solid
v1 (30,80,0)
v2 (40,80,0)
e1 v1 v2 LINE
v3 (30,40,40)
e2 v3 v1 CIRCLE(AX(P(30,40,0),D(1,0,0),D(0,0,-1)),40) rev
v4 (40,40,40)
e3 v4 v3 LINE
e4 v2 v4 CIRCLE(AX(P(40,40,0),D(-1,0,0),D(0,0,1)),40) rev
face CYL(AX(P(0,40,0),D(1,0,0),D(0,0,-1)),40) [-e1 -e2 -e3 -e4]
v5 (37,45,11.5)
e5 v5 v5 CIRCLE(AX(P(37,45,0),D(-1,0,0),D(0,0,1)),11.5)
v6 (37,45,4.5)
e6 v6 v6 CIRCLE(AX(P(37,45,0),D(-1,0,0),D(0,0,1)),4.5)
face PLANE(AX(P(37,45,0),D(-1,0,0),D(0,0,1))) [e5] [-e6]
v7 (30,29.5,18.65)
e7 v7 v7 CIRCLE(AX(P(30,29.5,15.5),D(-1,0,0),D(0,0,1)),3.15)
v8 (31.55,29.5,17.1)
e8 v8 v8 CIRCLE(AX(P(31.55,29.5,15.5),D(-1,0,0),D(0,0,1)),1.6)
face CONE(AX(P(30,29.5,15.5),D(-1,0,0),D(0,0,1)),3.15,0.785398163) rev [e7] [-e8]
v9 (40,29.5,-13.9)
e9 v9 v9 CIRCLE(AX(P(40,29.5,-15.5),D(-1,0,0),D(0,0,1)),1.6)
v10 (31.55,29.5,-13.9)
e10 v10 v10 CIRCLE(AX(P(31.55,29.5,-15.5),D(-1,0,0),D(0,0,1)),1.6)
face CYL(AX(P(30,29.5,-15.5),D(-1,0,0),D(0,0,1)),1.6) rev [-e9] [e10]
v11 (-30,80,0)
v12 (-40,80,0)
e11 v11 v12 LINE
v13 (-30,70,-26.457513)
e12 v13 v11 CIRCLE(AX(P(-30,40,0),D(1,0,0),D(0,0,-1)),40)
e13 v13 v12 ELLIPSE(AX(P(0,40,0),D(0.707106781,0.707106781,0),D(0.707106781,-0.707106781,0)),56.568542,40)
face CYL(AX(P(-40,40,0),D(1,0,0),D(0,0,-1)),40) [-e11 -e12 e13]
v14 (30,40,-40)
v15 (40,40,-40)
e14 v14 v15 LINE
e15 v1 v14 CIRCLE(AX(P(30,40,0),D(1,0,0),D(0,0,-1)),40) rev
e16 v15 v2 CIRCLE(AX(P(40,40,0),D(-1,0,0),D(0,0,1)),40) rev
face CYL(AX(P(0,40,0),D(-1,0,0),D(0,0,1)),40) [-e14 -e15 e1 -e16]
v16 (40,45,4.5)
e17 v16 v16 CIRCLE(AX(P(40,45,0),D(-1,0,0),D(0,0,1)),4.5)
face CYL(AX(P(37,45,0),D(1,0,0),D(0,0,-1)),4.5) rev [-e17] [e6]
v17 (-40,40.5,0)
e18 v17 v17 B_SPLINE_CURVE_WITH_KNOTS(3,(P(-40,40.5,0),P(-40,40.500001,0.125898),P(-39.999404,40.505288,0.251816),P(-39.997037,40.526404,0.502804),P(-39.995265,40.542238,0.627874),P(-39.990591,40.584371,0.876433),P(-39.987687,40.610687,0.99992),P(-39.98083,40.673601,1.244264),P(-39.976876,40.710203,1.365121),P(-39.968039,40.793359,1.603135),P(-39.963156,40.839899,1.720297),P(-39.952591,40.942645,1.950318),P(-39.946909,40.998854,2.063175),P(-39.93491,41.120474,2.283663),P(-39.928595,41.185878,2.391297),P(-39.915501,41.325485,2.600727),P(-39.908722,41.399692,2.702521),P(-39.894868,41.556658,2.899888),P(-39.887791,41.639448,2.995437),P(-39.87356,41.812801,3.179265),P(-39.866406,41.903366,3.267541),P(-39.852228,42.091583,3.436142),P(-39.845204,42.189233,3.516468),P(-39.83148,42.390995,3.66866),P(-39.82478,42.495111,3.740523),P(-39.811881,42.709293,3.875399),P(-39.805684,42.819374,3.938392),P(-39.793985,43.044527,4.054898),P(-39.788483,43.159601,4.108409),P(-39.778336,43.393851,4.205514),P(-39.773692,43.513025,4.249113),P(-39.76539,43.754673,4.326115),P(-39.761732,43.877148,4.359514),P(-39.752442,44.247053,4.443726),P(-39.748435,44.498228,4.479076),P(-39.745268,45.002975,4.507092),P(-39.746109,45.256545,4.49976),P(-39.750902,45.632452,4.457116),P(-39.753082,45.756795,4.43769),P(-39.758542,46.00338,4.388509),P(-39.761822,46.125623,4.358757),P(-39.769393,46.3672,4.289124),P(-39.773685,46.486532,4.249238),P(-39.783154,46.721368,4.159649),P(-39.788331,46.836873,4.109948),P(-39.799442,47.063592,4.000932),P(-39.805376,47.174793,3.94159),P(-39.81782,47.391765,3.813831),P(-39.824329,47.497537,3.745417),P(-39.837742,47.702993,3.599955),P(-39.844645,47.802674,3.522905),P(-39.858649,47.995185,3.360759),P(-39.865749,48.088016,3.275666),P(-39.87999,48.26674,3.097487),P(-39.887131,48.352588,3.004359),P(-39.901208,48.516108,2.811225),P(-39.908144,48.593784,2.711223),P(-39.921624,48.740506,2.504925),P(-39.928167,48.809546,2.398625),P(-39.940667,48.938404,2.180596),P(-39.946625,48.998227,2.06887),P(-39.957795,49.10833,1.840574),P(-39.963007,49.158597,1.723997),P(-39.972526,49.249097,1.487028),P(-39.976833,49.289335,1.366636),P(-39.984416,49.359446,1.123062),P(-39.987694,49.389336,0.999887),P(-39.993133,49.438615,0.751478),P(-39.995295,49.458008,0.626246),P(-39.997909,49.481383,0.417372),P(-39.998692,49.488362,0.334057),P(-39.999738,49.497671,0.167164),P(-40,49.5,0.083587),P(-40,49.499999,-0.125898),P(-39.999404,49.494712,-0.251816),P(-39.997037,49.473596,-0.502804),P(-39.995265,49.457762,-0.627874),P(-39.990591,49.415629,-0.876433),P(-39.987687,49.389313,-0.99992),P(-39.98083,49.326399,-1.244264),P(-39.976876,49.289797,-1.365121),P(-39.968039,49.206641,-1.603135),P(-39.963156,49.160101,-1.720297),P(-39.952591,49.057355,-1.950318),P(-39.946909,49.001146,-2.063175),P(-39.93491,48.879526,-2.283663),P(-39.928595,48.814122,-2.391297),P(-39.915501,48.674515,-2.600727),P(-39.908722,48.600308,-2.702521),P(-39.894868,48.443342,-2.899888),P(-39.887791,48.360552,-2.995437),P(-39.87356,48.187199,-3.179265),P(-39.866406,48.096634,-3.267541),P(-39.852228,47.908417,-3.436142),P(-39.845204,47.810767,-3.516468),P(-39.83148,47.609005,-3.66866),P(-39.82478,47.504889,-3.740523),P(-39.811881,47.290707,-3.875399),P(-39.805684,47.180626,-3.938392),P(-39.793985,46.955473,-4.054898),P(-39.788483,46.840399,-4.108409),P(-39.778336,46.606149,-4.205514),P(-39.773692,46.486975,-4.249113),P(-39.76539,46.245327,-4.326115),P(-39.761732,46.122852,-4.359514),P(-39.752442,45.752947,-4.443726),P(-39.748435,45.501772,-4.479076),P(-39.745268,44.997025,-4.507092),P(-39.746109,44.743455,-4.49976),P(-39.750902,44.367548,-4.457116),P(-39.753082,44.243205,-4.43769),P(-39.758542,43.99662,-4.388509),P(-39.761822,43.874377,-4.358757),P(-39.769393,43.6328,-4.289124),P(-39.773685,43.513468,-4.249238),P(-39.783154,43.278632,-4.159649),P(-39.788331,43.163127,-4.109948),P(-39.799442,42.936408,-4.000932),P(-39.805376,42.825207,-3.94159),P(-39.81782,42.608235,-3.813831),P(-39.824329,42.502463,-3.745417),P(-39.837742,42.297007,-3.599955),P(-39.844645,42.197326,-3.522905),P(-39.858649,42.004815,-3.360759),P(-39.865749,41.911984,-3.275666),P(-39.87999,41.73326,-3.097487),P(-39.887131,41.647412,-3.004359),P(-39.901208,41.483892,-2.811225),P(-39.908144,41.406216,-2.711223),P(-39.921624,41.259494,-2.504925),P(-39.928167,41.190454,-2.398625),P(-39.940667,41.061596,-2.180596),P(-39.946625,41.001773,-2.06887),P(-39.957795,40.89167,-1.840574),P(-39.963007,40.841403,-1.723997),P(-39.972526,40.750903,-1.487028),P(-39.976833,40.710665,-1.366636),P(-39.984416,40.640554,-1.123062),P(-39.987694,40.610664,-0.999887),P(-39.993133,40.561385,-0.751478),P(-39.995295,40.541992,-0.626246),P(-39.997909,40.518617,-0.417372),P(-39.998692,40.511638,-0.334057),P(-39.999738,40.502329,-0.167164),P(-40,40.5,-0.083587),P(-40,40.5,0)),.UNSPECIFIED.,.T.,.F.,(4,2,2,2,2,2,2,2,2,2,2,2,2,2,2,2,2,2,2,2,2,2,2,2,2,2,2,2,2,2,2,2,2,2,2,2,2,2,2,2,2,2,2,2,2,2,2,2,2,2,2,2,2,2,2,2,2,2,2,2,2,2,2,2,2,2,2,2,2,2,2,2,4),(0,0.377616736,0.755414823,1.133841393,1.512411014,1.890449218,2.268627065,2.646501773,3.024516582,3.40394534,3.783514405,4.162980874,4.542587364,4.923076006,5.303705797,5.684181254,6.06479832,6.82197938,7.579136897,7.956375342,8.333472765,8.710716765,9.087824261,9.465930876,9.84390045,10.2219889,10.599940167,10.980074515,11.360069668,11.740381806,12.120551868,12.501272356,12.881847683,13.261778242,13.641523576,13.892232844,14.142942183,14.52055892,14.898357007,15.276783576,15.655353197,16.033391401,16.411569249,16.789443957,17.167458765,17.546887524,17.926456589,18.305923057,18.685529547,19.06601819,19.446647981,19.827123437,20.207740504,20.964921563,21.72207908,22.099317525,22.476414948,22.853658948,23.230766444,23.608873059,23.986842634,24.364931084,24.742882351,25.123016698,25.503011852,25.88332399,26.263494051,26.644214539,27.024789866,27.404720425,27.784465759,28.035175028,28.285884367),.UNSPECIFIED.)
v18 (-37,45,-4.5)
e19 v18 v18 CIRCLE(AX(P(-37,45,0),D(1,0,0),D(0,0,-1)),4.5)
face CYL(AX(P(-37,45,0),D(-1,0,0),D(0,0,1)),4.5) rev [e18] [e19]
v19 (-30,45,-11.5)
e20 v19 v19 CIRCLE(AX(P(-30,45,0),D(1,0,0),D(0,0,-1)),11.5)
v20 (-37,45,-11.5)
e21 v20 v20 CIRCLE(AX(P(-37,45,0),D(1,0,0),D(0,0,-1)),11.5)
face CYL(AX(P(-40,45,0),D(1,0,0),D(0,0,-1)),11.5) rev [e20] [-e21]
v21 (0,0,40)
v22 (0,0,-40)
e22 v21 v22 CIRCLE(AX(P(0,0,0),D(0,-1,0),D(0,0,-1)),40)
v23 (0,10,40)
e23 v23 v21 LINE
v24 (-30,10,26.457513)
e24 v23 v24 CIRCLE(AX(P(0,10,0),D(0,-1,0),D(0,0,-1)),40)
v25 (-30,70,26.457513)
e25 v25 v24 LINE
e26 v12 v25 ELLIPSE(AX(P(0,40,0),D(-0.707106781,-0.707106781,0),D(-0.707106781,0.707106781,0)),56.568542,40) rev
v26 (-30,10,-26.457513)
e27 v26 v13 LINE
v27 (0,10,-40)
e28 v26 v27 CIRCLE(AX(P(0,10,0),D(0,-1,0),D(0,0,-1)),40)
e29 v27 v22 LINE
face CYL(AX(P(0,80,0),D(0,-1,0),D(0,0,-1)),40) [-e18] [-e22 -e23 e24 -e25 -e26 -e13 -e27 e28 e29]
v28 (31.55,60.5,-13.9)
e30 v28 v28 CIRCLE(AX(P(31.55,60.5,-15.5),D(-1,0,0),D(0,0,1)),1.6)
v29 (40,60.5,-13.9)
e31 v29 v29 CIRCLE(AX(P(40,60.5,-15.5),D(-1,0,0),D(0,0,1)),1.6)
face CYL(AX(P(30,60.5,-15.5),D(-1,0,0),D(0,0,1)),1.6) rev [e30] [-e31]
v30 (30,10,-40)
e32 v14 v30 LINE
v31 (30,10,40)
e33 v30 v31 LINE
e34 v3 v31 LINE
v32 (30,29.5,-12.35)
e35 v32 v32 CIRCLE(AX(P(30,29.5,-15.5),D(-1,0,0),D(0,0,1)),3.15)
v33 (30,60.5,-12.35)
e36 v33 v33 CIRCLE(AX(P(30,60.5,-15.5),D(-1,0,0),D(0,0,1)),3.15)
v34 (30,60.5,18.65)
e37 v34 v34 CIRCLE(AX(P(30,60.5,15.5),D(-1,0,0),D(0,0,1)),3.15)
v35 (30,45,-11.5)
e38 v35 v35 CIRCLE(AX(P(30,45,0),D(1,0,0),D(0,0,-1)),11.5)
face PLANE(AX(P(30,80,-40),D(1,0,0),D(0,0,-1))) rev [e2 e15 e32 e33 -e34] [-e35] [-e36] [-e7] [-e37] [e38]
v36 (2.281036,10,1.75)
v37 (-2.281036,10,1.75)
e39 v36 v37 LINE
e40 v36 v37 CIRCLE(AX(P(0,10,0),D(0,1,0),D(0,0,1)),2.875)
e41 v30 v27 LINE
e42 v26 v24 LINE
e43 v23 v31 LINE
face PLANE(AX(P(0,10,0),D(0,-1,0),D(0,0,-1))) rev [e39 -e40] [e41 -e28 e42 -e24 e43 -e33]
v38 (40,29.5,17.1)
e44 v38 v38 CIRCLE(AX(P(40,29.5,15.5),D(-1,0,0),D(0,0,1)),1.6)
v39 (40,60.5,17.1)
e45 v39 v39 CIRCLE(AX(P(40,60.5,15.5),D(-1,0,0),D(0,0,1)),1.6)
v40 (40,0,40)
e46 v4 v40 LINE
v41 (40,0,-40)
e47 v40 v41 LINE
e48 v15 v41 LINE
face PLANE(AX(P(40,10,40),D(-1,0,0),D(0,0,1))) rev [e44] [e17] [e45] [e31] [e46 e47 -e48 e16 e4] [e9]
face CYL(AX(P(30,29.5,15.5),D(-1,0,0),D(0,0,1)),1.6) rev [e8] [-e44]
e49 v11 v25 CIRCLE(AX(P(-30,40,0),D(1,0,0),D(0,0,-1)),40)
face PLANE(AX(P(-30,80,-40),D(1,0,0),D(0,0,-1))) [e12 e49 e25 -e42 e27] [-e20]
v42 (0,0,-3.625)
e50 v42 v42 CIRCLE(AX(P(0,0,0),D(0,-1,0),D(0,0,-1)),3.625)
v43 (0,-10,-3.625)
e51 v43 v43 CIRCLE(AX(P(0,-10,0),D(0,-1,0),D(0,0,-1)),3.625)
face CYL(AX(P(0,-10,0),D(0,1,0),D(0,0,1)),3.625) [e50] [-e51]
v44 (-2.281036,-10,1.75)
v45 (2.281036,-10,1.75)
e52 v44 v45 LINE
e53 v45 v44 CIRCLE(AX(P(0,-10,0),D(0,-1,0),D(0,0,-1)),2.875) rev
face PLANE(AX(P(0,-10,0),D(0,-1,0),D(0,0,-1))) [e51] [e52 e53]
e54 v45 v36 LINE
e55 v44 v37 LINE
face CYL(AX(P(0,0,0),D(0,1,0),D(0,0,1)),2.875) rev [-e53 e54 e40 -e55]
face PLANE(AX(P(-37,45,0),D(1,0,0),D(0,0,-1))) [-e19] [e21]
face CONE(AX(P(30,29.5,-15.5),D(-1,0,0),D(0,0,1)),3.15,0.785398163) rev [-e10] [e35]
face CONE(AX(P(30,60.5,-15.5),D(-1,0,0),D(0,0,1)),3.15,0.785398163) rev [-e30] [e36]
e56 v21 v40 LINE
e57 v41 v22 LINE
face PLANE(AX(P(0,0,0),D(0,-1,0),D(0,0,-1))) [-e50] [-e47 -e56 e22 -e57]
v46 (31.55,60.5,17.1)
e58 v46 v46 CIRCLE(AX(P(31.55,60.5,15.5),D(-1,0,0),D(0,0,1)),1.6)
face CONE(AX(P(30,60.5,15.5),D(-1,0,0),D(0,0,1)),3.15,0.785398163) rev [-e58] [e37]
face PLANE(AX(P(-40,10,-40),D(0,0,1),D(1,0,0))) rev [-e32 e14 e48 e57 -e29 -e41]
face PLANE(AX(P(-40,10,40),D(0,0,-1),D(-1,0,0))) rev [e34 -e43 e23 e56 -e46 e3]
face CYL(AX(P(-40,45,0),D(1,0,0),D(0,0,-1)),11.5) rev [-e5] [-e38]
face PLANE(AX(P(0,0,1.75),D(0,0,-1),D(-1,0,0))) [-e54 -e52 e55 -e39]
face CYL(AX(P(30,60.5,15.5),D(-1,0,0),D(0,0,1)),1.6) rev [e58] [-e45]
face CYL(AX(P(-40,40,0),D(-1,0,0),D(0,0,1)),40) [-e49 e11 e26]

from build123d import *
from build123d.topology import SkipClean

# Parameters (mm, degrees)
SKETCH1_W                                           = 80
SKETCH1_H                                           = 80
BOSS_EXTRUDE1_DEPTH                                 = 10
SKETCH2_W                                           = 10
SKETCH2_H                                           = 80
BOSS_EXTRUDE2_DEPTH                                 = 70
CSK_FOR_M3_COUNTERSUNK_FLAT_HEAD_SCREW1_D           = 3.2
CSK_FOR_M3_COUNTERSUNK_FLAT_HEAD_SCREW1_CSINK_D     = 6.3
CSK_FOR_M3_COUNTERSUNK_FLAT_HEAD_SCREW1_CSINK_ANGLE = 90
CUT_EXTRUDE2_DEPTH                                  = 91
SKETCH7_R                                           = 11.5
CUT_EXTRUDE1_DEPTH                                  = 121
FILLET2_R                                           = 40
SKETCH12_R                                          = 3.625
BOSS_EXTRUDE3_DEPTH                                 = 10
BOSS_EXTRUDE4_START                                 = -7
SKETCH14_R                                          = 11.5
SKETCH14_R_2                                        = 4.5
BOSS_EXTRUDE4_DEPTH                                 = 3
CUT_EXTRUDE4_DEPTH                                  = 98.979589711
BOSS_EXTRUDE5_START                                 = -10
SKETCH15_R                                          = 11.5
SKETCH15_R_2                                        = 4.5
BOSS_EXTRUDE5_DEPTH                                 = 3


with BuildPart() as part:
    # Sketch1 → Boss-Extrude1 (new body)
    with BuildSketch(Plane(origin=(0, 0, 0), x_dir=(1, 0, 0), z_dir=(0, 1, 0))):
        Rectangle(SKETCH1_W, SKETCH1_H)
    extrude(amount=BOSS_EXTRUDE1_DEPTH)

    # Sketch2 → Boss-Extrude2 (add)
    with BuildSketch(Plane(origin=(0, 10, 0), x_dir=(1, 0, 0), z_dir=(0, 1, 0))):
        with Locations((35, 0)):
            Rectangle(SKETCH2_W, SKETCH2_H)
    boss_extrude2 = extrude(amount=BOSS_EXTRUDE2_DEPTH)

    # CSK for M3 Countersunk Flat Head Screw1 (through all)
    with Locations(Plane.ZY.offset(-30)):
        with Locations((-15.5, 60.5), (15.5, 60.5), (15.5, 29.5), (-15.5, 29.5)):
            CounterSinkHole(CSK_FOR_M3_COUNTERSUNK_FLAT_HEAD_SCREW1_D / 2, CSK_FOR_M3_COUNTERSUNK_FLAT_HEAD_SCREW1_CSINK_D / 2, counter_sink_angle=CSK_FOR_M3_COUNTERSUNK_FLAT_HEAD_SCREW1_CSINK_ANGLE)

    # Mirror1: Boss-Extrude2 across plane
    add(boss_extrude2.mirror(Plane(origin=(0, 0, 0), x_dir=(0, 0, 1), z_dir=(1, 0, 0))))

    # Sketch11 → Cut-Extrude2 (cut, through all)
    with BuildSketch(Plane(origin=(0, 10, 0), x_dir=(1, 0, 0), z_dir=(0, 1, 0))):
        with BuildLine():
            Line((-2.281035949, -1.75), (2.281035949, -1.75))
            ThreePointArc((2.281035949, -1.75), (2.722462429, -0.924025608), (2.875, 0))
            ThreePointArc((2.875, 0), (-0.924025608, 2.722462429), (-2.281035949, -1.75))
        make_face()
    extrude(amount=-CUT_EXTRUDE2_DEPTH, mode=Mode.SUBTRACT)

    # Sketch7 → Cut-Extrude1 (cut, through all)
    with BuildSketch(Plane(origin=(40, 0, 0), x_dir=(0, 0, -1), z_dir=(1, 0, 0))):
        with Locations((0, 45)):
            Circle(SKETCH7_R)
    extrude(amount=-CUT_EXTRUDE1_DEPTH, mode=Mode.SUBTRACT)

    # Fillet2
    fillet2_edges = [part.edges().sort_by_distance(p)[0] for p in [
        (35, 80, -40),
        (35, 80, 40),
        (-35, 80, 40),
        (-35, 80, -40),
    ]]
    fillet(fillet2_edges, radius=FILLET2_R - 0.0001)  # a hair under: the kernel refuses the full size

    # Sketch12 → Boss-Extrude3 (add)
    with BuildSketch(Plane.XZ):
        with Locations(Location((0, 0, 0), (0, 0, 270))):
            Circle(SKETCH12_R)
        with BuildLine():
            Line((-2.281035949, 1.75), (2.281035949, 1.75))
            ThreePointArc((2.281035949, 1.75), (0, -2.875), (-2.281035949, 1.75))
        make_face(mode=Mode.SUBTRACT)
    extrude(amount=BOSS_EXTRUDE3_DEPTH)

    # Sketch14 → Boss-Extrude4 (add)
    with BuildSketch(Plane(origin=(-30, 0, 0), x_dir=(0, 0, -1), z_dir=(1, 0, 0)).offset(BOSS_EXTRUDE4_START)):
        with Locations((0, 45)):
            Circle(SKETCH14_R)
        with Locations((0, 45)):
            Circle(SKETCH14_R_2, mode=Mode.SUBTRACT)
    extrude(amount=-BOSS_EXTRUDE4_DEPTH)

    # Sketch13 → Cut-Extrude4 (cut, through all)
    with SkipClean():  # the faces are left unmerged after this step: merging them gives an invalid solid
        with BuildSketch(Plane(origin=(0, 0, 0), x_dir=(-1, 0, 0), z_dir=(0, -1, 0))):
            with BuildLine():
                Line((40, -40), (40, 0))
                ThreePointArc((40, 0), (28.284271346, -28.284271149), (2.79e-07, -40))
                Line((2.79e-07, -40), (40, -40))
            make_face()
            with BuildLine():
                Line((40, 0), (40, 40))
                Line((40, 40), (2.4e-08, 40))
                ThreePointArc((2.4e-08, 40), (28.284271256, 28.284271239), (40, 0))
            make_face()
        extrude(amount=-CUT_EXTRUDE4_DEPTH, mode=Mode.SUBTRACT)

    # Sketch15 → Boss-Extrude5 (add)
    with SkipClean():  # the faces are left unmerged after this step: merging them gives an invalid solid
        with BuildSketch(Plane.ZY.offset(-30).offset(BOSS_EXTRUDE5_START)):
            with Locations(Location((0, 45, 0), (0, 0, 180))):
                Circle(SKETCH15_R)
            with Locations(Location((0, 45, 0), (0, 0, 270))):
                Circle(SKETCH15_R_2, mode=Mode.SUBTRACT)
        extrude(amount=BOSS_EXTRUDE5_DEPTH)


solid = part.part
